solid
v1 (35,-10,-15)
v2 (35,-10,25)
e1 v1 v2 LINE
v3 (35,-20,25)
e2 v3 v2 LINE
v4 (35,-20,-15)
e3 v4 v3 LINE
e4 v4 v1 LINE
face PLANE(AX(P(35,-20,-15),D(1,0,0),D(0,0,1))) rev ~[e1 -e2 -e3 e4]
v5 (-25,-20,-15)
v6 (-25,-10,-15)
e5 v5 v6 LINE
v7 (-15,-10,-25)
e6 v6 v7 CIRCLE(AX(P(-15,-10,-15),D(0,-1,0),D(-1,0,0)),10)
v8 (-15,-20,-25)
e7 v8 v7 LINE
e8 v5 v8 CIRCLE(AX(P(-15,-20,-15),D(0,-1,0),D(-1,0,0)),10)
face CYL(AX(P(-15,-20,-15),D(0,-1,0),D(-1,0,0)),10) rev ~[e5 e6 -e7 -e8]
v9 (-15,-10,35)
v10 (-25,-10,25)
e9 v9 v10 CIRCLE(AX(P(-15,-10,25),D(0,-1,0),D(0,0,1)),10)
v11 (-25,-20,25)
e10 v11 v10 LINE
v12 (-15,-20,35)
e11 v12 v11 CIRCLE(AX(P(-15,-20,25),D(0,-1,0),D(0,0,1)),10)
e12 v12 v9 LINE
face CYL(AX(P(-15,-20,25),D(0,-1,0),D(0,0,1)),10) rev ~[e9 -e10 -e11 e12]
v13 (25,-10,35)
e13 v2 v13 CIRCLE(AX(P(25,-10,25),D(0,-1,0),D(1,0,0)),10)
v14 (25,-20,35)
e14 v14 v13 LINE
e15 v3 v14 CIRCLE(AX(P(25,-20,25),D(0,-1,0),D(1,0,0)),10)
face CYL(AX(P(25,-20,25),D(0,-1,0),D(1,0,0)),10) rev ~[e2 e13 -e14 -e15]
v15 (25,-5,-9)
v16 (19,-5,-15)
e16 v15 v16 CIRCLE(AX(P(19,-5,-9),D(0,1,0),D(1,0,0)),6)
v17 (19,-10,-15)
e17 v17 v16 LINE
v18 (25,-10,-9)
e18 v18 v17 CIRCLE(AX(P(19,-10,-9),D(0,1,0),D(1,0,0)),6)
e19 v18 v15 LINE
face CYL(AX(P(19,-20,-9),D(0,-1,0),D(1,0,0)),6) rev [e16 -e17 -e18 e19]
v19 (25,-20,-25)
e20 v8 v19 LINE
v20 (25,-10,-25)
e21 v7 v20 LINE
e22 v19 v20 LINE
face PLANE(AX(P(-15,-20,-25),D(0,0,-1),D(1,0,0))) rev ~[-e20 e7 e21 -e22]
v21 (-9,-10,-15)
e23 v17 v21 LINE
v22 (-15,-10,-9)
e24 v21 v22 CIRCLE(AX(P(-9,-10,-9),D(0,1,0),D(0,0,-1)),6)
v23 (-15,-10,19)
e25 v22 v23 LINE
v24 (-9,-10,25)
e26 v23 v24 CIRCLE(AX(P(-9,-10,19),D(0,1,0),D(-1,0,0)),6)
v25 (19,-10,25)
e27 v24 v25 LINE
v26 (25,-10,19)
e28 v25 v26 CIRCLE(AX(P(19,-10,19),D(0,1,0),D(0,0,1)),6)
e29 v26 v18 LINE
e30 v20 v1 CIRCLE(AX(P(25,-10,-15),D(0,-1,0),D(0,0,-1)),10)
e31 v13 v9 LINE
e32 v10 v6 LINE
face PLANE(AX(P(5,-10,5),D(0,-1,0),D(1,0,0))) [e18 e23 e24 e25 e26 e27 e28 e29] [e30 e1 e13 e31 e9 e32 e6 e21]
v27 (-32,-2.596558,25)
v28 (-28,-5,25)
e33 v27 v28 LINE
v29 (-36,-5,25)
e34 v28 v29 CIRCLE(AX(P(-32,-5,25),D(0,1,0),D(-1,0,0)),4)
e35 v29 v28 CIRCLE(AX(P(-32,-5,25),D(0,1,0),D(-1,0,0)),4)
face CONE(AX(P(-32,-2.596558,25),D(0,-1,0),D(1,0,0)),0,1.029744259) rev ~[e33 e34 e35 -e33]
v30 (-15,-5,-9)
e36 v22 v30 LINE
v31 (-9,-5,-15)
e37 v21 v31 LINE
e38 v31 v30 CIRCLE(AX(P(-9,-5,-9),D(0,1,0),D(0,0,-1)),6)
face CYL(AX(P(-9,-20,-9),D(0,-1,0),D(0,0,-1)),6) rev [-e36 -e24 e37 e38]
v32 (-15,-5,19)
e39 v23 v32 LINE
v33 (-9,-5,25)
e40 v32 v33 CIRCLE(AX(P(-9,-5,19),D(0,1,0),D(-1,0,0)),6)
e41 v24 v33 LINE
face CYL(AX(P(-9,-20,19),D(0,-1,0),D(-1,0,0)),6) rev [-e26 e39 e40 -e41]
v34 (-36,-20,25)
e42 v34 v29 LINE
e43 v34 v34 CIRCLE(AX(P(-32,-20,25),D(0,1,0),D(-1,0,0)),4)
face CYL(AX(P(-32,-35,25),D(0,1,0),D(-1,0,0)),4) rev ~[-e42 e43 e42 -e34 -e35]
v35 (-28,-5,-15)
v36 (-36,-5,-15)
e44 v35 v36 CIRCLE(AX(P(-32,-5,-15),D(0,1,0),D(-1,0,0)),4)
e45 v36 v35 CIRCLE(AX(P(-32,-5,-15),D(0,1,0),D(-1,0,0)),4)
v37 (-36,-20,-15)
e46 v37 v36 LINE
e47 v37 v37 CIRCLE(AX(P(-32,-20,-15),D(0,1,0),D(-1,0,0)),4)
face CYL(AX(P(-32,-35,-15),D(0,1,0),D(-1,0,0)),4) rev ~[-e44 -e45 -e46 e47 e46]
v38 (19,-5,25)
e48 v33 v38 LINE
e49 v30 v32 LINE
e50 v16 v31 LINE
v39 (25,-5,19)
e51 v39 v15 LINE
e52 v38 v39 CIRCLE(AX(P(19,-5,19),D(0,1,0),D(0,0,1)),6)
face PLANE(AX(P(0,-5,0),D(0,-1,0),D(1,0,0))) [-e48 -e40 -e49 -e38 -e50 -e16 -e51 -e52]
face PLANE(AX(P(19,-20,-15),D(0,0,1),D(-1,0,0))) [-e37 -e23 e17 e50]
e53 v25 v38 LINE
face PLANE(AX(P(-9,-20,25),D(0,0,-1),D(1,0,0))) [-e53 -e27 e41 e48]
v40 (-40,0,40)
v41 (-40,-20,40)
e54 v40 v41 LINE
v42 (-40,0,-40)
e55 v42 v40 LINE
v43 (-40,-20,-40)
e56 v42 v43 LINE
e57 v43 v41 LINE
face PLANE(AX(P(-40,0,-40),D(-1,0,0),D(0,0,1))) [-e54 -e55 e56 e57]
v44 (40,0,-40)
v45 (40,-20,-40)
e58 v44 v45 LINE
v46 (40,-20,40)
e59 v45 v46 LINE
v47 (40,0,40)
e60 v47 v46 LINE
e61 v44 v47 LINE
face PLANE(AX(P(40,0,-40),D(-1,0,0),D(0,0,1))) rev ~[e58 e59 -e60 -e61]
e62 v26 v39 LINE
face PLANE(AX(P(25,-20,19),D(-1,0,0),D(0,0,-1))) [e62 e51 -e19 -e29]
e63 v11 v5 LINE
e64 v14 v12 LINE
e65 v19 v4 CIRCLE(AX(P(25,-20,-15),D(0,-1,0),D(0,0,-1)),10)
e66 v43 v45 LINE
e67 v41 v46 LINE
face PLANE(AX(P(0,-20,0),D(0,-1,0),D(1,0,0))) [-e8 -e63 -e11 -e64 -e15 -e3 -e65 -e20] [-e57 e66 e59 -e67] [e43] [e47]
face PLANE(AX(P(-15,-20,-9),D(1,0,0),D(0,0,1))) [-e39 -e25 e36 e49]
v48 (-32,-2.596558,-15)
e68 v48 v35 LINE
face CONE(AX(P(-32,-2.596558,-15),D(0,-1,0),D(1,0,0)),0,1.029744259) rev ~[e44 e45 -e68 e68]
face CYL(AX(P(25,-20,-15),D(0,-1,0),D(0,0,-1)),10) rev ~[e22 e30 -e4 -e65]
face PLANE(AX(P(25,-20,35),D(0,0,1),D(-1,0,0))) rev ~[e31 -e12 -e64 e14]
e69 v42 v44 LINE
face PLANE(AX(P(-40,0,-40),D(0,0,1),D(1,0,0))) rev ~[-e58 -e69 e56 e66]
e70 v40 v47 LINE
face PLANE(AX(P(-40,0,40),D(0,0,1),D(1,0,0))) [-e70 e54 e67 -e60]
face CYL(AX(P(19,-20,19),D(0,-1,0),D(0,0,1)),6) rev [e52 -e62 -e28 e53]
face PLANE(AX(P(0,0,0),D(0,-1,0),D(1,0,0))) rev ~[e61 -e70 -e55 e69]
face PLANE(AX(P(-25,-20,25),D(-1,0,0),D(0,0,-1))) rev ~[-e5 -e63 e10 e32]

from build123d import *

# Parameters (mm, degrees)
F0_W     = 80
F0_H     = 80
F1_DEPTH = 20
F3_D     = 8
F3_DEPTH = 15
F3_TIP   = 2.4034424761
F5_DEPTH = 10
F6_DEPTH = 15


with BuildPart() as f1:
    # F0 (on Front) → F1 (new body)
    with BuildSketch(Plane.XZ):
        Rectangle(F0_W, F0_H)
    extrude(amount=F1_DEPTH)

    # F3
    with Locations(Plane.XZ.offset(20)):
        with Locations((-32, 25), (-32, -15)):
            Hole(F3_D / 2, depth=F3_DEPTH)
            with Locations((0, 0, -(F3_DEPTH + F3_TIP / 2))):  # 118° drill point
                Cone(0, F3_D / 2, F3_TIP, mode=Mode.SUBTRACT)

    # F4 (on face) → F5 (cut)
    with BuildSketch(Plane.XZ.offset(20)):
        with BuildLine():
            Line((-15, -25), (25, -25))
            ThreePointArc((25, -25), (32.0710678119, -22.0710678119), (35, -15))
            Line((35, -15), (35, 25))
            ThreePointArc((35, 25), (32.0710678119, 32.0710678119), (25, 35))
            Line((25, 35), (-15, 35))
            ThreePointArc((-15, 35), (-22.0710678119, 32.0710678119), (-25, 25))
            Line((-25, 25), (-25, -15))
            ThreePointArc((-25, -15), (-22.0710678119, -22.0710678119), (-15, -25))
        make_face()
        with BuildLine():
            ThreePointArc((25, -9), (23.2426406871, -13.2426406871), (19, -15))
            Line((19, -15), (-9, -15))
            ThreePointArc((-9, -15), (-13.2426406871, -13.2426406871), (-15, -9))
            Line((-15, -9), (-15, 19))
            ThreePointArc((-15, 19), (-13.2426406871, 23.2426406871), (-9, 25))
            Line((-9, 25), (19, 25))
            ThreePointArc((19, 25), (23.2426406871, 23.2426406871), (25, 19))
            Line((25, 19), (25, -9))
        make_face(mode=Mode.SUBTRACT)
    extrude(amount=-F5_DEPTH, mode=Mode.SUBTRACT)

    # F6 (cut): a face of the model
    f6_faces = [f1.faces().sort_by_distance(p)[0] for p in [
        (5, -20, 5),
    ]]
    extrude(f6_faces, amount=-F6_DEPTH, mode=Mode.SUBTRACT)


solid = f1.part
